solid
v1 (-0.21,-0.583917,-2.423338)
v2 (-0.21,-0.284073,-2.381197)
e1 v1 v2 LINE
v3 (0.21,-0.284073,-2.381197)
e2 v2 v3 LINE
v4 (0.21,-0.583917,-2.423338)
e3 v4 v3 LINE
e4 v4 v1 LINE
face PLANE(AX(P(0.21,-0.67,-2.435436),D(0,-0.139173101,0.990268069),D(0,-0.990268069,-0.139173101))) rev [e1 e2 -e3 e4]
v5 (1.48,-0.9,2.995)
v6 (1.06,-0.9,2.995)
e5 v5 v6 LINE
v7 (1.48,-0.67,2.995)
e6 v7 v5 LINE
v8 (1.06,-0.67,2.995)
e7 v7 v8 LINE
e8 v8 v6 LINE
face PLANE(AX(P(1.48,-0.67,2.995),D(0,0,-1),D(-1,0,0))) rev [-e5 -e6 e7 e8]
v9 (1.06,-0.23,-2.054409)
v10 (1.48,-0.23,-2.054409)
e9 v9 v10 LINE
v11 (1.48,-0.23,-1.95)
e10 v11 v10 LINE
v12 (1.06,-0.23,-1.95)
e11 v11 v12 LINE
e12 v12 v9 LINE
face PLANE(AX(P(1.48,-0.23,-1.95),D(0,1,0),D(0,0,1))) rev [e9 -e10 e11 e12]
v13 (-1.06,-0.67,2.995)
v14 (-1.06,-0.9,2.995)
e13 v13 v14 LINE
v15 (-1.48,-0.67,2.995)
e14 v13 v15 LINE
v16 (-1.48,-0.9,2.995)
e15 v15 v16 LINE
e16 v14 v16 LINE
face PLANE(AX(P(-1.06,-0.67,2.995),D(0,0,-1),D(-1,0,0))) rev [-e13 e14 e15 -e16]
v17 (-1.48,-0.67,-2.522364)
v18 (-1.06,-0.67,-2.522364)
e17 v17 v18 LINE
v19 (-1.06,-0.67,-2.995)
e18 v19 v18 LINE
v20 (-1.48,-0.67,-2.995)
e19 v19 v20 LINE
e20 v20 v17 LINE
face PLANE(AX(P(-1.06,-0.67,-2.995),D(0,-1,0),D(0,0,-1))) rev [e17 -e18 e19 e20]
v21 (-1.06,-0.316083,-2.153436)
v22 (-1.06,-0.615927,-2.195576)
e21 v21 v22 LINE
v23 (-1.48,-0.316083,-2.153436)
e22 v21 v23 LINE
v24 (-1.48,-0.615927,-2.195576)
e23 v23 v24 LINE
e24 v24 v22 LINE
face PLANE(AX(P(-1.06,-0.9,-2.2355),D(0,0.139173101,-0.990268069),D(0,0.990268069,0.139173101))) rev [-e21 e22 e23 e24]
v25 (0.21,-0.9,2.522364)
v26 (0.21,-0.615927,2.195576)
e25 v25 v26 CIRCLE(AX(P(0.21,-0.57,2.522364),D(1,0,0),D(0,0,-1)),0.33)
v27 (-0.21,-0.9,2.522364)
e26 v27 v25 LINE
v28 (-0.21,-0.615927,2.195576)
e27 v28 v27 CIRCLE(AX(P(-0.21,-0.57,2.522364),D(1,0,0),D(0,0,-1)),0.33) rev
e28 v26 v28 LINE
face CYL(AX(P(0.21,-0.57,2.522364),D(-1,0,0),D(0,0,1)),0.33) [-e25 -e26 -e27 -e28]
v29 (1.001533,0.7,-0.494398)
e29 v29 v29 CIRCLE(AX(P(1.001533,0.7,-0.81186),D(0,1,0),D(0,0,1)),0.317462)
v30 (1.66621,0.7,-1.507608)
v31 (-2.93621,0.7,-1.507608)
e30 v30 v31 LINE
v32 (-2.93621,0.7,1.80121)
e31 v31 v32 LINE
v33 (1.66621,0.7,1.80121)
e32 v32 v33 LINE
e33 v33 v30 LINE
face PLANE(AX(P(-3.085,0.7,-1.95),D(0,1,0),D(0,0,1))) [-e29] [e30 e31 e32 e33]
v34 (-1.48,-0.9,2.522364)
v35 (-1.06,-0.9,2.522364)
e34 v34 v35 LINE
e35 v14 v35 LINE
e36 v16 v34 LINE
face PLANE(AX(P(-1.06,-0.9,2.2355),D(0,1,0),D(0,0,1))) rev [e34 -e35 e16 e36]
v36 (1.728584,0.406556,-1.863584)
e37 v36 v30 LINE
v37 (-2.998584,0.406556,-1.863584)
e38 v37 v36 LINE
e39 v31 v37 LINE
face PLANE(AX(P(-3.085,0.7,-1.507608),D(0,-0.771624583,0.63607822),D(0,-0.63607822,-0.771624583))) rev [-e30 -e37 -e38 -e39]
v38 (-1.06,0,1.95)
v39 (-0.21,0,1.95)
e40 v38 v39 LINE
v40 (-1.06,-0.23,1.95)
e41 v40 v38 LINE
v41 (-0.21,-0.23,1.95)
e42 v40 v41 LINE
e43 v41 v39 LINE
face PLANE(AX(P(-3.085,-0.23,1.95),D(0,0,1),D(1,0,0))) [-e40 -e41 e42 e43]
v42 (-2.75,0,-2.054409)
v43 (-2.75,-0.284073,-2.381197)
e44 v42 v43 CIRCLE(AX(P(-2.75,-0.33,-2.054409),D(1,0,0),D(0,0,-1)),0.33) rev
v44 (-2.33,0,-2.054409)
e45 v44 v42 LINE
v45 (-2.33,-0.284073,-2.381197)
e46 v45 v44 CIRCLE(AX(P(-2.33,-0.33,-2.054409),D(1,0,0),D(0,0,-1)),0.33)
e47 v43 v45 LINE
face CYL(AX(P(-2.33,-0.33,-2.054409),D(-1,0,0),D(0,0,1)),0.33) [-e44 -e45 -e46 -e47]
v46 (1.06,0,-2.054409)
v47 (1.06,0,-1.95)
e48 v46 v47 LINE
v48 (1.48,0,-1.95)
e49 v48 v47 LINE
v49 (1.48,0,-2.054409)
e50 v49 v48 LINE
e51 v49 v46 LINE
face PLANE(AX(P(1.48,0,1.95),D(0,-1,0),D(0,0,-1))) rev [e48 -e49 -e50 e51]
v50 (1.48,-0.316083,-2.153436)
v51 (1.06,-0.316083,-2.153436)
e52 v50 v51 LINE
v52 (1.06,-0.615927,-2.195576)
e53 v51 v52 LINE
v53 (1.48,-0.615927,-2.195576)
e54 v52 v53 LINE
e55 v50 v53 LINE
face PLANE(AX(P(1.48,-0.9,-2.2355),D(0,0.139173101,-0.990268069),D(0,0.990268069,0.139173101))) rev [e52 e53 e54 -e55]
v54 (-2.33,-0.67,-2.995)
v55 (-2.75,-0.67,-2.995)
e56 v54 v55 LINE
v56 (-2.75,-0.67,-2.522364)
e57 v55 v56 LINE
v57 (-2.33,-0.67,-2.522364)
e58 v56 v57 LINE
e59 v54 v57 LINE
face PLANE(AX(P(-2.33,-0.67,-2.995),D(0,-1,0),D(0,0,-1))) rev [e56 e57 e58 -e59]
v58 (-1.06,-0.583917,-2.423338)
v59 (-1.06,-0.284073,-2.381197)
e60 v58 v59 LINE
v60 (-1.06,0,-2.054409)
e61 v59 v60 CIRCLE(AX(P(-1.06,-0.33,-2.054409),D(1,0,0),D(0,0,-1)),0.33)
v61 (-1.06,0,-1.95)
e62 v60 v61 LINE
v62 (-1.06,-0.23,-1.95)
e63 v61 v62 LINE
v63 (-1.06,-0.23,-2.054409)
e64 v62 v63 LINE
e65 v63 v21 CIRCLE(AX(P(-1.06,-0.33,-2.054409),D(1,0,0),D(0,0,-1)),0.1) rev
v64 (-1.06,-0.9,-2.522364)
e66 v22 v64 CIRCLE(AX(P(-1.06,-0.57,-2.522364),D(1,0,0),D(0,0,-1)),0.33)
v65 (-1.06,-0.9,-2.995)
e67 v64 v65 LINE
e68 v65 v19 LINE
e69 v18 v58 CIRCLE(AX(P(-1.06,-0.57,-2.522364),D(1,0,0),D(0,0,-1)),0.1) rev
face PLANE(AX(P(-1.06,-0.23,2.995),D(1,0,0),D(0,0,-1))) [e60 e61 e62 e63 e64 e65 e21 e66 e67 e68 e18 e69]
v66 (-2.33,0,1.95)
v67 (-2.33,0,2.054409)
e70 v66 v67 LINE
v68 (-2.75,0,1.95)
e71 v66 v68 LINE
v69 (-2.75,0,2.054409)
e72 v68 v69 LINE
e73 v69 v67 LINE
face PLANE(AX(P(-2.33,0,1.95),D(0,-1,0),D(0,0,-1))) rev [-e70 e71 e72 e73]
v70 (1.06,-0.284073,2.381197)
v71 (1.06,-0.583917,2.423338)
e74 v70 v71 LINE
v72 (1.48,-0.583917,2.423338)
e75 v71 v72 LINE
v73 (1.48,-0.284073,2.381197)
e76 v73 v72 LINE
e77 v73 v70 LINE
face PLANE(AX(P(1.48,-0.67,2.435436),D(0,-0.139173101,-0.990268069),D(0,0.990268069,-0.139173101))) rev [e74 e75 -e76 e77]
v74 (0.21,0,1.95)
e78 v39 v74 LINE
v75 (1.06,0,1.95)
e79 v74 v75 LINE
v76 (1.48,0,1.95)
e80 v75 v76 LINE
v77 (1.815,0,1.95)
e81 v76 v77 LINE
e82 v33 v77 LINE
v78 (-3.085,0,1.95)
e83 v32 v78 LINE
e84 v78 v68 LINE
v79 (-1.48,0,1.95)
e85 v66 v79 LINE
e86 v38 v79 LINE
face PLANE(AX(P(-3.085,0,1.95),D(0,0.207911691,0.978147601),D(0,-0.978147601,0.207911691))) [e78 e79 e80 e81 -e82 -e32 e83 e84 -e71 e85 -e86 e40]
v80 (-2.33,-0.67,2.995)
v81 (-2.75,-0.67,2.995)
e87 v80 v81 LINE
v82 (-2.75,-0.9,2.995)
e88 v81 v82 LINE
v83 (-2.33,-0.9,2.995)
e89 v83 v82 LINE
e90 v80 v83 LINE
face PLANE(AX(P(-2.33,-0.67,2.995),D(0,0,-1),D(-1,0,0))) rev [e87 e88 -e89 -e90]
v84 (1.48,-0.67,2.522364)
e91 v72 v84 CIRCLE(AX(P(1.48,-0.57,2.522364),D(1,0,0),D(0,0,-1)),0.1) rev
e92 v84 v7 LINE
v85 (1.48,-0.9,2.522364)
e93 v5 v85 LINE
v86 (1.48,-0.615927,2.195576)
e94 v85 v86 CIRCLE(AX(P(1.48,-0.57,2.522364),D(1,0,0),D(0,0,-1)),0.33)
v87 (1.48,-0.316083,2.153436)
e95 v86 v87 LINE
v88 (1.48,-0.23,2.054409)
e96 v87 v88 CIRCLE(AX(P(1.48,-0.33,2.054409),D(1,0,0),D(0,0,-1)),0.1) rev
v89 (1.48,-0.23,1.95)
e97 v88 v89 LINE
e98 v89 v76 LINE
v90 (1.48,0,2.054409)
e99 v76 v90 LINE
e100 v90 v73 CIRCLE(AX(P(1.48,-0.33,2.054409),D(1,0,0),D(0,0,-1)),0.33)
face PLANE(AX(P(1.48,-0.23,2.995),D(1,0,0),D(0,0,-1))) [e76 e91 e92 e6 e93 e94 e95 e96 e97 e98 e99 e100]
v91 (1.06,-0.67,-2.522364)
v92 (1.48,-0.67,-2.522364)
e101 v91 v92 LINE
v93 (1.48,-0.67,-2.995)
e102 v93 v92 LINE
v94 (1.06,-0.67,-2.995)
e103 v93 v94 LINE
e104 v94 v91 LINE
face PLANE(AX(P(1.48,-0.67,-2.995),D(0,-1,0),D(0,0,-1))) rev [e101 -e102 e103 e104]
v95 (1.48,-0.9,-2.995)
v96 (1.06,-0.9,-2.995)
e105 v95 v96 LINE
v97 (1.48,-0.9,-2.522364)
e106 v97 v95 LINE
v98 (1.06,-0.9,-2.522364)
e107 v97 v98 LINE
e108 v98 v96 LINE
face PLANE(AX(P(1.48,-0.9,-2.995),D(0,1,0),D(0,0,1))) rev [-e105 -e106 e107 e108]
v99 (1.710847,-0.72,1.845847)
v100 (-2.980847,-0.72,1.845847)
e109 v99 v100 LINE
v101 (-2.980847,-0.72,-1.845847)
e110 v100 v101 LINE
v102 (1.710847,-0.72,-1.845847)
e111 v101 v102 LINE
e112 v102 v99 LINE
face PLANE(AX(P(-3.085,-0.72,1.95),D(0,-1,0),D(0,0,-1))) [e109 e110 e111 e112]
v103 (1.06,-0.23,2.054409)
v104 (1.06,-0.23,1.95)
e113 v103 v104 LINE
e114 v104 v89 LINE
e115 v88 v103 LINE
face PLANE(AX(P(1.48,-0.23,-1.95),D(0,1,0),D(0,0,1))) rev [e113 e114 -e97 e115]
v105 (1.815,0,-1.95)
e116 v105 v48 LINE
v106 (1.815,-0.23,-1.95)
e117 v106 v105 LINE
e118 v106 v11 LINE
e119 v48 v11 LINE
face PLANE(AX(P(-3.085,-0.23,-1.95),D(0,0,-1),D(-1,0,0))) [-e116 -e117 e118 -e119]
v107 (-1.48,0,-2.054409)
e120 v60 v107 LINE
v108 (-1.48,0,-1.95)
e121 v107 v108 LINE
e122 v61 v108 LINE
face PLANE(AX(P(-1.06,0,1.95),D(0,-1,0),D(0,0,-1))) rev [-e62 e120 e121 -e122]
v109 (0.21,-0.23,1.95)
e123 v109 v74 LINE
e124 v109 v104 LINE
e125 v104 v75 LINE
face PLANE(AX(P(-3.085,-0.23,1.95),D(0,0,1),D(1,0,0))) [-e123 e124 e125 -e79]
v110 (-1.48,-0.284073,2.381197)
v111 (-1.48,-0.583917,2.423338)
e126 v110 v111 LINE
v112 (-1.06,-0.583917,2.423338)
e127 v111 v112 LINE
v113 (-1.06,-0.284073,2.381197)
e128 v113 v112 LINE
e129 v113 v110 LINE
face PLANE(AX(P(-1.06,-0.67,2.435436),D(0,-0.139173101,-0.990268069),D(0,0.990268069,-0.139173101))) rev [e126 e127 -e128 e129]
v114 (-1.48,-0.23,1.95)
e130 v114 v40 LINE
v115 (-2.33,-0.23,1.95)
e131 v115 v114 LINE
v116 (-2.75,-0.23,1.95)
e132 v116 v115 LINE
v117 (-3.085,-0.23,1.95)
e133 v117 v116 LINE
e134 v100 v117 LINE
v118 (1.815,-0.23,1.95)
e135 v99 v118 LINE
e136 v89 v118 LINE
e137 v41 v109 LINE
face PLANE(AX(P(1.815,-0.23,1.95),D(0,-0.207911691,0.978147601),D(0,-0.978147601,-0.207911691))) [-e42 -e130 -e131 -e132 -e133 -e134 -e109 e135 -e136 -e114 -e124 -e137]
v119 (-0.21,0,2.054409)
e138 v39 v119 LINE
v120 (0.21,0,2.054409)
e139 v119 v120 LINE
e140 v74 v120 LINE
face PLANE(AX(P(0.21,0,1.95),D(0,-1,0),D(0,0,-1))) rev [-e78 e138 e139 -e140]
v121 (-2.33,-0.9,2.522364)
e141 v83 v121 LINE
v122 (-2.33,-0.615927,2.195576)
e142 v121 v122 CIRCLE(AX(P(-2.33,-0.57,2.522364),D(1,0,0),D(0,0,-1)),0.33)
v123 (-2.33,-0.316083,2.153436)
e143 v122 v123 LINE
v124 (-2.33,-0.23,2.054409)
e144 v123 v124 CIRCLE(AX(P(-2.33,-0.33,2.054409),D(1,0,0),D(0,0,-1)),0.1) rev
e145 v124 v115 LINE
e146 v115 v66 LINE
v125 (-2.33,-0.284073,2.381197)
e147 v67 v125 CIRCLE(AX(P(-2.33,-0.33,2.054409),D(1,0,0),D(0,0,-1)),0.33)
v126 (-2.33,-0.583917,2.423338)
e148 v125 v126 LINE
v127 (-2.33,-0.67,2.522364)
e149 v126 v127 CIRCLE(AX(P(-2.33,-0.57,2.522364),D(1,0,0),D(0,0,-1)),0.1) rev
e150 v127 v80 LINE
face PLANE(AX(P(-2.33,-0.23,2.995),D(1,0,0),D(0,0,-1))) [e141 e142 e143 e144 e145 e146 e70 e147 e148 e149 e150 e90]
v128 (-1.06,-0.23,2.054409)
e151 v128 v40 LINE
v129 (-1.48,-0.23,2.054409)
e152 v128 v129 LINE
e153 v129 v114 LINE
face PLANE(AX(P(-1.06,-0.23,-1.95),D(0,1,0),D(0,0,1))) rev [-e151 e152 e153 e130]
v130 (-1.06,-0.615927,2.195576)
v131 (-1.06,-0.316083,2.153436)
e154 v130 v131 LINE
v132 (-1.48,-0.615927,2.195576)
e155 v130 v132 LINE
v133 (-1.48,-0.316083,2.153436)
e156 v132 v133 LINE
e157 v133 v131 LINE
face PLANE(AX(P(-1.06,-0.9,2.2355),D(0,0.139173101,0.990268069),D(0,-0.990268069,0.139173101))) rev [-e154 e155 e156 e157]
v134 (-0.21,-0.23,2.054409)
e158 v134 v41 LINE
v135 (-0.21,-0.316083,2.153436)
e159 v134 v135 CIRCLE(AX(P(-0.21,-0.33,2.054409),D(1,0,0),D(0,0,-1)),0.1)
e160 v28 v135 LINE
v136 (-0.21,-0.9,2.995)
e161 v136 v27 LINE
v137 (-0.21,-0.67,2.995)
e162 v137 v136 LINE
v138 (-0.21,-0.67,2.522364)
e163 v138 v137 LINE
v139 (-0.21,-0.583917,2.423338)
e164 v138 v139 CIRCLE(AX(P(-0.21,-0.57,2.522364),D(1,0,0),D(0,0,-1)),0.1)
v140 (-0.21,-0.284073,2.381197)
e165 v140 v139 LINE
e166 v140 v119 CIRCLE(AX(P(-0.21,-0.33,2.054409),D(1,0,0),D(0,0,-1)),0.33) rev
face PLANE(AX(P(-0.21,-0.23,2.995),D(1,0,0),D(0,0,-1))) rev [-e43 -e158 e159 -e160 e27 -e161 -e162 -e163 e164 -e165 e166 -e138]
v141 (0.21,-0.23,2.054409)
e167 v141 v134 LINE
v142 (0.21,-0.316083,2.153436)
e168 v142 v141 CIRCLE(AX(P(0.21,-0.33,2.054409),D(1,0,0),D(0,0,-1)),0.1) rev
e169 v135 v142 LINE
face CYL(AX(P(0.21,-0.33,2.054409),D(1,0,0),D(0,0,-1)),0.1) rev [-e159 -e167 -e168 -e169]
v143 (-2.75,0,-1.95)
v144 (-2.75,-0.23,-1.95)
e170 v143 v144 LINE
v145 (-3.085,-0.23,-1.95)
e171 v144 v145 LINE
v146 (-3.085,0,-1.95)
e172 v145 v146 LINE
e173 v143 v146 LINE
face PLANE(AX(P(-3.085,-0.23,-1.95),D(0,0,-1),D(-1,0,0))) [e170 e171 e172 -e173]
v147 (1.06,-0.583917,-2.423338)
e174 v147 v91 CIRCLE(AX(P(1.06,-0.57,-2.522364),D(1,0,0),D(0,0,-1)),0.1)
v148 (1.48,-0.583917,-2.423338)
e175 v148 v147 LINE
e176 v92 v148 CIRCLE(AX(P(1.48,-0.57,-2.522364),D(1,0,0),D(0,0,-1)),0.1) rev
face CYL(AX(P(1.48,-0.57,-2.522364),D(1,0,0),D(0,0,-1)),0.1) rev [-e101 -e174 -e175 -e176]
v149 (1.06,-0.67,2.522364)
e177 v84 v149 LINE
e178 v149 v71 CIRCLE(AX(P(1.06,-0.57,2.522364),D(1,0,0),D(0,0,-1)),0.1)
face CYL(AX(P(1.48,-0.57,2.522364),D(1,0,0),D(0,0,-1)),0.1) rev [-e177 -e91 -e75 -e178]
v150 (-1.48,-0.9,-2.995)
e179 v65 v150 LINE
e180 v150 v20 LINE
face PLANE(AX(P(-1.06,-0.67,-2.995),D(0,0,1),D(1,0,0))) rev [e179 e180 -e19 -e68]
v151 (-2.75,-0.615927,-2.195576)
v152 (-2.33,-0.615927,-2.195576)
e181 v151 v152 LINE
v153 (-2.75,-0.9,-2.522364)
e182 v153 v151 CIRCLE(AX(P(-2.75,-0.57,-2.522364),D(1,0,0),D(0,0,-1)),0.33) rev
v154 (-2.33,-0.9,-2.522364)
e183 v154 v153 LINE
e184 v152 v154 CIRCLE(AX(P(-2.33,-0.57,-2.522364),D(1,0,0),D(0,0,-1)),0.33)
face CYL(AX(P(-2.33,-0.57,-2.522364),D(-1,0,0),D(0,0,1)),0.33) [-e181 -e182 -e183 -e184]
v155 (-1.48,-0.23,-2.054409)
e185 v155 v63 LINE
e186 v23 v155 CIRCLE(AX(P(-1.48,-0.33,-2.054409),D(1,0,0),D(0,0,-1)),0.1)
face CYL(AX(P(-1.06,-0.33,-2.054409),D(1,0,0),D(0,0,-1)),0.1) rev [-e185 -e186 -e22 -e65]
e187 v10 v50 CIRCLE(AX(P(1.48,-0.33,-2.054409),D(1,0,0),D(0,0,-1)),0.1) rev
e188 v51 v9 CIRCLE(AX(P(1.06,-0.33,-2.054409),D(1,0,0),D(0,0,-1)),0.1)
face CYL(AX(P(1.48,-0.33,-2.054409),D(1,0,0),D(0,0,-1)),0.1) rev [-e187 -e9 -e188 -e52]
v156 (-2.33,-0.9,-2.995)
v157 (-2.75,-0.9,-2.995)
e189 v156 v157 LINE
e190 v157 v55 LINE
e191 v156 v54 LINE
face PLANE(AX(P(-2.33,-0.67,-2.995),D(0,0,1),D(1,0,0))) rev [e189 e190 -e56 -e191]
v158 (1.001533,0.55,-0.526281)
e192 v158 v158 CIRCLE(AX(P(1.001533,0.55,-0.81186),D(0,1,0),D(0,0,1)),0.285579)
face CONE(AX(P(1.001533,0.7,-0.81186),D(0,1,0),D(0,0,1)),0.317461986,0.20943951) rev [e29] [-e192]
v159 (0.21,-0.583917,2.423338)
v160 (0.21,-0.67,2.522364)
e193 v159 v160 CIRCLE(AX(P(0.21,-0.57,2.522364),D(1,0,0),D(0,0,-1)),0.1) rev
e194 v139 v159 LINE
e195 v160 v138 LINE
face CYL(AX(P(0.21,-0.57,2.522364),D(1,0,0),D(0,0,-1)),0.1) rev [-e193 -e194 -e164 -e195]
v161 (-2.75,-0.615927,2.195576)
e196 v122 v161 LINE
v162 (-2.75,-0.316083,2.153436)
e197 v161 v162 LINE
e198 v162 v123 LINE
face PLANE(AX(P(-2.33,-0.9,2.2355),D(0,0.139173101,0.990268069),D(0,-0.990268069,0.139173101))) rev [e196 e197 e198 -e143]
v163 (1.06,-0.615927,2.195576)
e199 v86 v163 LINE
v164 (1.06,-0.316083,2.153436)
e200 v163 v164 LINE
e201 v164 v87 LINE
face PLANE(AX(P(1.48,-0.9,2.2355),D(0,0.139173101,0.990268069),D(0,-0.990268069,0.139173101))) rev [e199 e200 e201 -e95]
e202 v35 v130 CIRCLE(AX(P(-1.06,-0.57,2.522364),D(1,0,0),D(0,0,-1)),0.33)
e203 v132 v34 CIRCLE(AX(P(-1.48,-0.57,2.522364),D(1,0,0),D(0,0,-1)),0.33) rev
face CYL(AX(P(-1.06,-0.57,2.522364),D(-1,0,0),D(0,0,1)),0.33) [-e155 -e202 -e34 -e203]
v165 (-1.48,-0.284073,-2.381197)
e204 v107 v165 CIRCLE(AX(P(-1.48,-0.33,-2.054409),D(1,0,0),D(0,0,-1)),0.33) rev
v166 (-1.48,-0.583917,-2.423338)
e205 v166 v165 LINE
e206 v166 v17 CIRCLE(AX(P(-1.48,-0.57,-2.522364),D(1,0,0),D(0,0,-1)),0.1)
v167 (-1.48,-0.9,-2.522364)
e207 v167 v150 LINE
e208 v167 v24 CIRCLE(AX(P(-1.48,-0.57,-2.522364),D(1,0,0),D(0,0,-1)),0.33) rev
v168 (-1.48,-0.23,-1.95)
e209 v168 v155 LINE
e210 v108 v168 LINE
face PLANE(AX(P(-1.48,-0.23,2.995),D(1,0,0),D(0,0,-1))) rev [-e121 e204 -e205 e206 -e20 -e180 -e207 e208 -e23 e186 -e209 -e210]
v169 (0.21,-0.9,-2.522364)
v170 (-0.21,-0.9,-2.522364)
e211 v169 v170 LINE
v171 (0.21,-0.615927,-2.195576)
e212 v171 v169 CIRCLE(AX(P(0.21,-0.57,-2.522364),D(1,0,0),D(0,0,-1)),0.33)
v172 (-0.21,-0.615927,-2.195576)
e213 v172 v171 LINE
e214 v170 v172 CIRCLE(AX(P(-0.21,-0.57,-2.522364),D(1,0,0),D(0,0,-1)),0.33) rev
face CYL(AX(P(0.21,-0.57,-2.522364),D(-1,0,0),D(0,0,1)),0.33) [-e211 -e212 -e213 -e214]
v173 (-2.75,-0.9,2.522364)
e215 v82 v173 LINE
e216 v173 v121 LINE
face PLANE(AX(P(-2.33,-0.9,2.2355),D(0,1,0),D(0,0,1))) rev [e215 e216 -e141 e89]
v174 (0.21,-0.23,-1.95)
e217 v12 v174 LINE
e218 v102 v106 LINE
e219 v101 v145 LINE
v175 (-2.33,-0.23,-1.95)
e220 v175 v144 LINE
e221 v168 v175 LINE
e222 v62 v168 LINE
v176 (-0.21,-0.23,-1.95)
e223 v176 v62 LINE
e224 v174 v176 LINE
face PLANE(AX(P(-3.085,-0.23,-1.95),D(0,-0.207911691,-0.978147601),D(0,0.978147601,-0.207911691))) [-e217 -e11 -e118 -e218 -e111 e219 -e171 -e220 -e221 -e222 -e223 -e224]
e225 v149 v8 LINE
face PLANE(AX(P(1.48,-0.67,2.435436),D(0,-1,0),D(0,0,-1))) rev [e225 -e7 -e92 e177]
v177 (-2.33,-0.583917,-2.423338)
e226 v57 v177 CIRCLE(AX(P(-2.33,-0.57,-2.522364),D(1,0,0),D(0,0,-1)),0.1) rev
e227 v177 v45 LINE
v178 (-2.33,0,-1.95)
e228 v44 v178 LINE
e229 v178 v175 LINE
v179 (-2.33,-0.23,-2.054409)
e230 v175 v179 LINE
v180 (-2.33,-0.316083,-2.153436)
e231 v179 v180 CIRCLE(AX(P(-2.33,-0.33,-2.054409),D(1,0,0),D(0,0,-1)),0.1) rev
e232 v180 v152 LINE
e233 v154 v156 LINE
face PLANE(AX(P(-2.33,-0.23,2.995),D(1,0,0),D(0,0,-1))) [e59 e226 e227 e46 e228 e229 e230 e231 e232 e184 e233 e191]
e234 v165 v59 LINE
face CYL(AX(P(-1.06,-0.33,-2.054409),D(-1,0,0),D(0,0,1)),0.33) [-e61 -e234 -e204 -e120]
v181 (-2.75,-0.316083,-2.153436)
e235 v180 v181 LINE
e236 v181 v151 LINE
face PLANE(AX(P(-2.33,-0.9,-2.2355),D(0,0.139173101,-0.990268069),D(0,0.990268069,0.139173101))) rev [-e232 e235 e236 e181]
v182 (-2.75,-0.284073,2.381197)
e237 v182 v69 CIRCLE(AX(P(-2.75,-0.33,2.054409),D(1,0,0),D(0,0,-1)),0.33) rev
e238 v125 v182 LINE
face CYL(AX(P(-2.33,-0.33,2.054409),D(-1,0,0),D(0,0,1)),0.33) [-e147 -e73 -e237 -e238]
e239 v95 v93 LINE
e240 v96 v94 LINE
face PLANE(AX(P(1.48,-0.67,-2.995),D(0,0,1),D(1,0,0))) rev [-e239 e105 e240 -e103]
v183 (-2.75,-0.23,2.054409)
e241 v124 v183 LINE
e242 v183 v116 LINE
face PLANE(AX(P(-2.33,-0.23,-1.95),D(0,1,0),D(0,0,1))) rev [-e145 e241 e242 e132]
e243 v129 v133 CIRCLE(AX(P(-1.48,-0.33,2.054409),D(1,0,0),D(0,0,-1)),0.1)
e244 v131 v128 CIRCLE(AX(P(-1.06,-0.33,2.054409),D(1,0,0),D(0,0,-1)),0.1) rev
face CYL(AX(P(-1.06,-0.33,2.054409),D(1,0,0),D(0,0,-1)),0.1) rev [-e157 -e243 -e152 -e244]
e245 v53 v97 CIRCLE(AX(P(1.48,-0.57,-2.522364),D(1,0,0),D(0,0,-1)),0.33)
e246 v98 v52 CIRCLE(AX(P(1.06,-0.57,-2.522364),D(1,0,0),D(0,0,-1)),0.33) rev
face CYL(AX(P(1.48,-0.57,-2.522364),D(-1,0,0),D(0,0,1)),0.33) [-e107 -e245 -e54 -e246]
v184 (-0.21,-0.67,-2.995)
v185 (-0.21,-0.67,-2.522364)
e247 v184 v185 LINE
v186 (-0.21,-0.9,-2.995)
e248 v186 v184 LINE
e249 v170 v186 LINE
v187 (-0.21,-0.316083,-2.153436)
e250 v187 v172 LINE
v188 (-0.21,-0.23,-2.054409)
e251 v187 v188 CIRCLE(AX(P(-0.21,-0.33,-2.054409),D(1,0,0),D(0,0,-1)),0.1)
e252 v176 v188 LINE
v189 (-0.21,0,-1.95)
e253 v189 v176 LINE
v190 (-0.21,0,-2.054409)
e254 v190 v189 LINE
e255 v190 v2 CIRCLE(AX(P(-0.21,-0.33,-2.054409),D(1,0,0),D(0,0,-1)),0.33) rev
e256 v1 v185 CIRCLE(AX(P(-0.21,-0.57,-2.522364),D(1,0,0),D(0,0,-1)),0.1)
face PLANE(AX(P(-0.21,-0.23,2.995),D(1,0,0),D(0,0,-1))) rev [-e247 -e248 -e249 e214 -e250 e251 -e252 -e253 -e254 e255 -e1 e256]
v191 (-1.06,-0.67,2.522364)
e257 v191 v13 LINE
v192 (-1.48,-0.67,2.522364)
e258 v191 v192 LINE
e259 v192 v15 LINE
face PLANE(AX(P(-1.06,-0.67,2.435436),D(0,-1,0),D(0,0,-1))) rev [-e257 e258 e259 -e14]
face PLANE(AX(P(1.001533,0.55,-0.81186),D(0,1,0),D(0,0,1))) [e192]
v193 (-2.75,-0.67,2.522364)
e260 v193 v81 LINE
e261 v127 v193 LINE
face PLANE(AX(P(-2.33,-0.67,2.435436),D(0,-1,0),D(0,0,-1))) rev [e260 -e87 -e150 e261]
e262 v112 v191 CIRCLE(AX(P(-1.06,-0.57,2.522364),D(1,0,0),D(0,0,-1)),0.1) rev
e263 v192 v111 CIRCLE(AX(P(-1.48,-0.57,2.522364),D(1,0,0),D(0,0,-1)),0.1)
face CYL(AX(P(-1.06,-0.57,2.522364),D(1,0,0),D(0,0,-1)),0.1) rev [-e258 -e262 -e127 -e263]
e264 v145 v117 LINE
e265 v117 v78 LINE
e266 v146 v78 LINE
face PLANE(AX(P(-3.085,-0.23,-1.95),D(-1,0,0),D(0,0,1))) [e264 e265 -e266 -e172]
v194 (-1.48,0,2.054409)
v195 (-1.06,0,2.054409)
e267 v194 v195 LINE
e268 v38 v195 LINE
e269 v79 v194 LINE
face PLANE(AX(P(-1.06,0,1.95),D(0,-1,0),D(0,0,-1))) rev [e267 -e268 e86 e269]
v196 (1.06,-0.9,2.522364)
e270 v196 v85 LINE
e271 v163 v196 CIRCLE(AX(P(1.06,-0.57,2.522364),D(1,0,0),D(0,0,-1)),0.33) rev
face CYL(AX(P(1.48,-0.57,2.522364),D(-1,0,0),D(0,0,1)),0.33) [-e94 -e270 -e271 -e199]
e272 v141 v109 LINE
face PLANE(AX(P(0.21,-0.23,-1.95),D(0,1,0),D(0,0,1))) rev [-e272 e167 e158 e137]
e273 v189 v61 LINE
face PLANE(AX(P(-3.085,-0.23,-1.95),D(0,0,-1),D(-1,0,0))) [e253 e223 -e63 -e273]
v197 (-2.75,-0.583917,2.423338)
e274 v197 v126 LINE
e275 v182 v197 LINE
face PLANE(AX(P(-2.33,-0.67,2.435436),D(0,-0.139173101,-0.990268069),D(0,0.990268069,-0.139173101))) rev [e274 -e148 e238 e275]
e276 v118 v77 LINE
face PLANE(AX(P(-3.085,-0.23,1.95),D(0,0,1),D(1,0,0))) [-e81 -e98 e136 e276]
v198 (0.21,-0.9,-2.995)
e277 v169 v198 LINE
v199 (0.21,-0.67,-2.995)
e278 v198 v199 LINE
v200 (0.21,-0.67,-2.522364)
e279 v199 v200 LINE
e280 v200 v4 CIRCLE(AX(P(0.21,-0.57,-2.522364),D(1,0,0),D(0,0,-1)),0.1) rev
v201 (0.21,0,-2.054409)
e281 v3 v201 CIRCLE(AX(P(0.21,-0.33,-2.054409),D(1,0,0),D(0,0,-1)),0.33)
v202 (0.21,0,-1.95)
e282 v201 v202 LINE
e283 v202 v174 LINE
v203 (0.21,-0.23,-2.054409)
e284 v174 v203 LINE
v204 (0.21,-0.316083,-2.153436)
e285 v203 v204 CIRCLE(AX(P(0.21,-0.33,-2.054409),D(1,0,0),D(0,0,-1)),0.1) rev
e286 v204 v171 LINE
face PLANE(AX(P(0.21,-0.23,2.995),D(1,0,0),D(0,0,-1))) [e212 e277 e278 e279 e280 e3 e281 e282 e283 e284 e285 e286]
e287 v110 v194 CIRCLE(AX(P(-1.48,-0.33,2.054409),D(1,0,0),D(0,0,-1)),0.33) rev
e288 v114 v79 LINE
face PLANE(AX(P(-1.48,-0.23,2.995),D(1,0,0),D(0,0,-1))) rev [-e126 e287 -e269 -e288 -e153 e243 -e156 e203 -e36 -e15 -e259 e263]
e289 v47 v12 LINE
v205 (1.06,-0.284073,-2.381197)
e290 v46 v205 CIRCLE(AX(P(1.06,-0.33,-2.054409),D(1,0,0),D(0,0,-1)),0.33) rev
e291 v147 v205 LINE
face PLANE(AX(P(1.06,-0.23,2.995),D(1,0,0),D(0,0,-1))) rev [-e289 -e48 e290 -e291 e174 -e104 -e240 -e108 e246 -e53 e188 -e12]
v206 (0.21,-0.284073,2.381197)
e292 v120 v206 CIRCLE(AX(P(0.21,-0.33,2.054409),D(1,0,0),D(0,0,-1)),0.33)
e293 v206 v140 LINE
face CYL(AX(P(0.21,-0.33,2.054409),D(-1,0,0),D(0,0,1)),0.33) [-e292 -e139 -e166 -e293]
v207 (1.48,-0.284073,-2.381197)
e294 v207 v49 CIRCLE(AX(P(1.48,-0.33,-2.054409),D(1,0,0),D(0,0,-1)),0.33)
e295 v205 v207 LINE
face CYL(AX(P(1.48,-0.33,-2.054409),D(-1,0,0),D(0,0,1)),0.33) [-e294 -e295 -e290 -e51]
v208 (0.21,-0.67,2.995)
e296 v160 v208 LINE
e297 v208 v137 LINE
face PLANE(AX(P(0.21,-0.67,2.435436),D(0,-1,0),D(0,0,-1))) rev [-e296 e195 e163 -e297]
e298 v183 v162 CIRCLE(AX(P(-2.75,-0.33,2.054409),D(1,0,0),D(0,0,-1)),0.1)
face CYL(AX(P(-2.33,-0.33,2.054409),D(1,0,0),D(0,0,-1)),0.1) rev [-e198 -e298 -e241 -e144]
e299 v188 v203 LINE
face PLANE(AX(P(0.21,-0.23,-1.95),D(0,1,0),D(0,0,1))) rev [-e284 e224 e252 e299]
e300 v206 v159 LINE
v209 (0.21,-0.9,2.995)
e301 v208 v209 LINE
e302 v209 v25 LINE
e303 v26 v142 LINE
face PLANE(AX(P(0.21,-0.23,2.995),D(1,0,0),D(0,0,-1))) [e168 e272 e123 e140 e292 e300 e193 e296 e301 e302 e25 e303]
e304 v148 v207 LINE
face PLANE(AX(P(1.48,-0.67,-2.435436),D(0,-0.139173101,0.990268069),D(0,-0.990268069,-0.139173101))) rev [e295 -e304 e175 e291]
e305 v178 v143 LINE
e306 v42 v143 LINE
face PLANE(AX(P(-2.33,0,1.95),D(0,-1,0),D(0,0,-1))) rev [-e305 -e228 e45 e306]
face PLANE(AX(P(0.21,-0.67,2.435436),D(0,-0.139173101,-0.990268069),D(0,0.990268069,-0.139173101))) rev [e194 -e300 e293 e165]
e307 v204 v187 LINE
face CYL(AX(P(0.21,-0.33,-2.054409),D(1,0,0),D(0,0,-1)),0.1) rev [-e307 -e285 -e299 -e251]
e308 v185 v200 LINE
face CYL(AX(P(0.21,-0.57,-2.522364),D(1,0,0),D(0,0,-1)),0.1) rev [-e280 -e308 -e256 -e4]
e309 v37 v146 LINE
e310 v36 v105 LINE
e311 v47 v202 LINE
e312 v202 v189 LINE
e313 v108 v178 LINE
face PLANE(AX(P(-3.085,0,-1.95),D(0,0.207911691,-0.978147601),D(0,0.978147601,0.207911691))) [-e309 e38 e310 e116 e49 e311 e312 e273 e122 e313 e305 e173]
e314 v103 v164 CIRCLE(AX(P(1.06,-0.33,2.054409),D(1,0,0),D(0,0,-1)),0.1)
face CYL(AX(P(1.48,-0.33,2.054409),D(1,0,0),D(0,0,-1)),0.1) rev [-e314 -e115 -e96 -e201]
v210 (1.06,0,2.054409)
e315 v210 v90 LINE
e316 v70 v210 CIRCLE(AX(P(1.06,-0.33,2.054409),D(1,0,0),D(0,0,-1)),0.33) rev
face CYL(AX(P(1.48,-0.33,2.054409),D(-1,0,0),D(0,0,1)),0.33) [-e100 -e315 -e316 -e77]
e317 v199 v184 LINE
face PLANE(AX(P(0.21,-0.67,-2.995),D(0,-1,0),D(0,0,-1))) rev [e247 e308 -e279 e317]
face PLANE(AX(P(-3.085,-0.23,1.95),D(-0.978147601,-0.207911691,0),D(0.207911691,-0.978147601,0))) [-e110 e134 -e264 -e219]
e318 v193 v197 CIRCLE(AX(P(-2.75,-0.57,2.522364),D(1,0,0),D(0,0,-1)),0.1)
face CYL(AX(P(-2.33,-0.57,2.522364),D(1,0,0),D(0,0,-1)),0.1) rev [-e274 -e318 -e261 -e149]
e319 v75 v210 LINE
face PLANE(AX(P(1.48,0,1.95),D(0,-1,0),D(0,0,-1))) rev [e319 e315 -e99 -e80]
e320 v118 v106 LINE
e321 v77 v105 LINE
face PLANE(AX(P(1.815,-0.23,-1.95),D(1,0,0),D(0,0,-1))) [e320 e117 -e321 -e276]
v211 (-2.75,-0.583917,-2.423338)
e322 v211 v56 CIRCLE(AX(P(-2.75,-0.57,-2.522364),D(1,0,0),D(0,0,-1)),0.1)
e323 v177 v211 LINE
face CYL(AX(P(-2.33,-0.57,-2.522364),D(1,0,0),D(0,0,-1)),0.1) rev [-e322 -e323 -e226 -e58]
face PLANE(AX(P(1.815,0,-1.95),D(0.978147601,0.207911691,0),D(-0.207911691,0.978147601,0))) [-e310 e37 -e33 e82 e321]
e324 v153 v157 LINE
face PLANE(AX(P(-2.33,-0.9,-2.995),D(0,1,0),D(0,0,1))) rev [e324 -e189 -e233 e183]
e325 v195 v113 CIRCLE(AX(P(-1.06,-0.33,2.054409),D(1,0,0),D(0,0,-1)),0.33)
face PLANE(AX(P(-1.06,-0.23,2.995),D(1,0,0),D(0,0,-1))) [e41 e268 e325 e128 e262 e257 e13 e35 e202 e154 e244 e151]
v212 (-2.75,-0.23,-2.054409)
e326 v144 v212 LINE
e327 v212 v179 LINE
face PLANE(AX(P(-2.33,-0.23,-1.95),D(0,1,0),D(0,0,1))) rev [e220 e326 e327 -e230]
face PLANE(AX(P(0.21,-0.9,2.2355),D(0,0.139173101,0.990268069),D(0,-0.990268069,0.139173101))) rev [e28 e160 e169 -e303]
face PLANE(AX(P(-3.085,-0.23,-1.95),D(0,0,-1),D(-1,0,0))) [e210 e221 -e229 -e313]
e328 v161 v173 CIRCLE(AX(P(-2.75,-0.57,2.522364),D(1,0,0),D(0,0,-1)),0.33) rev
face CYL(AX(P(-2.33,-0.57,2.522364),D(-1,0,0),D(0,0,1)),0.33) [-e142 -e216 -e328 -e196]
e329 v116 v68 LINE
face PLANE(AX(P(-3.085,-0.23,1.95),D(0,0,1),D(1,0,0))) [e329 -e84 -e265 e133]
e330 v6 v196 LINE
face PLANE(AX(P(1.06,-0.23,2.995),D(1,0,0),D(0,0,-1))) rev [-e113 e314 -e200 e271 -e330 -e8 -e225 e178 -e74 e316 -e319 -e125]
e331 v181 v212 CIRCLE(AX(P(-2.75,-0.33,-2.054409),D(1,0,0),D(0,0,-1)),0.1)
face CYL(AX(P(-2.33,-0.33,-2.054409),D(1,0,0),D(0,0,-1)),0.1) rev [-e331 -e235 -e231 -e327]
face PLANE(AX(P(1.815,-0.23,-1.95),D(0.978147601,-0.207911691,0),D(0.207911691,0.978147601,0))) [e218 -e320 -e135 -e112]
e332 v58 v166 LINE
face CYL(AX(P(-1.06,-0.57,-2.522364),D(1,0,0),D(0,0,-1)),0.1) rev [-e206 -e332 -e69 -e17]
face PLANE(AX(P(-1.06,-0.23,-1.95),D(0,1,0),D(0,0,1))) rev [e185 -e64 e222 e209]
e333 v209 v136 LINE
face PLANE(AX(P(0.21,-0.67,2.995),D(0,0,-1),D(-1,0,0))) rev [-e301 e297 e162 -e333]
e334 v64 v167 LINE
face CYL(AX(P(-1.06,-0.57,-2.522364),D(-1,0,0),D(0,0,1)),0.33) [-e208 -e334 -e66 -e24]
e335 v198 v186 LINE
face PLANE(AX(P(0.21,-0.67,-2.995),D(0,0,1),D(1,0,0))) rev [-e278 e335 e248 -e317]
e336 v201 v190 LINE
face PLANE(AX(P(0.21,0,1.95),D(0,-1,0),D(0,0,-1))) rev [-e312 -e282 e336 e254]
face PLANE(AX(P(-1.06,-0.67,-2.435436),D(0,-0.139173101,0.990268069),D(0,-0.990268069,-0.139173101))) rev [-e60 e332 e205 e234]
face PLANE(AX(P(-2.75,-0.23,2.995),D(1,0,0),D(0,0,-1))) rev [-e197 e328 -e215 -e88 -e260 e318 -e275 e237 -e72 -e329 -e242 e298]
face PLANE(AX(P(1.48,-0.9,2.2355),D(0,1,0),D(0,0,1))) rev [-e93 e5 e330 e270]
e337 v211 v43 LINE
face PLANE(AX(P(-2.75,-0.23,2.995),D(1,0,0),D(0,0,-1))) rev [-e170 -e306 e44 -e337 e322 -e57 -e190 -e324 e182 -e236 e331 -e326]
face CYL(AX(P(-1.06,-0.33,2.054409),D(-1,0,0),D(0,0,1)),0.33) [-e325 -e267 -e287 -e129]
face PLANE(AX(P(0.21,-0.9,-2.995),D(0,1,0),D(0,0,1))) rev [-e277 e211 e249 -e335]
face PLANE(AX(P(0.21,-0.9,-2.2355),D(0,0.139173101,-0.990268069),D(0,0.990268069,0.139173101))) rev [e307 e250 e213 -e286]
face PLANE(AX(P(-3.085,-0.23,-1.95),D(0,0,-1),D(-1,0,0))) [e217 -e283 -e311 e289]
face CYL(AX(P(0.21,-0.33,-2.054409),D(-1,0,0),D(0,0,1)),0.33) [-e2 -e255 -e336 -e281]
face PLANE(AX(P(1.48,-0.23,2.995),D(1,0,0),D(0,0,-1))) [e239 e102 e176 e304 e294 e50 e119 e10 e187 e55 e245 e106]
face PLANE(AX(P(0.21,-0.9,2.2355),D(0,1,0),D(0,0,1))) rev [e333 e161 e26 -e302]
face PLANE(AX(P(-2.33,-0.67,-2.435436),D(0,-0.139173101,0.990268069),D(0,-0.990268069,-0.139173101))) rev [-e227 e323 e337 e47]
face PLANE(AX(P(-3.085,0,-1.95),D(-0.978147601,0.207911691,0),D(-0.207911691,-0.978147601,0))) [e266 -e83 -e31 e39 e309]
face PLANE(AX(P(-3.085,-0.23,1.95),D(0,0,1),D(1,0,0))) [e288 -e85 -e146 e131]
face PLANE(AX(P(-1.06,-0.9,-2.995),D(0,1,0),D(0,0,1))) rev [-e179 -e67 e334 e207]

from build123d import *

# Parameters (mm, degrees)
SKETCH1_W                = 4.9
SKETCH1_H                = 3.9
EXTRUDE1_DEPTH           = 0.7
EXTRUDE1_TAPER           = 12
EXTRUDE1_OTHER_WAY_DEPTH = 0.23
SKETCH2_W                = 4.9
SKETCH2_H                = 3.9
EXTRUDE2_DEPTH           = 0.49
EXTRUDE2_TAPER           = 12
CHAMFER1_SIZE            = 0.29360287
CHAMFER1_SIZE_2          = 0.3
SKETCH3_R                = 0.317461986
CUT_EXTRUDE1_DEPTH       = 0.15
CUT_EXTRUDE1_DRAFT       = -12
EXTRUDE3_DEPTH           = 0.21
LPATTERN3_COUNT          = 2
LPATTERN3_PITCH          = 1.27
LPATTERN3_COL_COUNT      = 3
LPATTERN3_COL_PITCH      = 1.27
FILLET1_R                = 0.1
FILLET2_R                = 0.33


with BuildPart() as part:
    # Sketch1 → Extrude1 (new body)
    with BuildSketch(Plane(origin=(0, 0, 0), x_dir=(1, 0, 0), z_dir=(0, 1, 0))):
        with Locations((-0.635, 0)):
            Rectangle(SKETCH1_W, SKETCH1_H)
    extrude(amount=EXTRUDE1_DEPTH, taper=EXTRUDE1_TAPER)

    # Sketch1 → Extrude1 other way (add)
    with BuildSketch(Plane(origin=(0, 0, 0), x_dir=(1, 0, 0), z_dir=(0, 1, 0))):
        with Locations((-0.635, 0)):
            Rectangle(SKETCH1_W, SKETCH1_H)
    extrude(amount=-EXTRUDE1_OTHER_WAY_DEPTH)

    # Sketch2 → Extrude2 (add)
    with BuildSketch(Plane.XZ.offset(0.23)):
        with Locations((-0.635, 0)):
            Rectangle(SKETCH2_W, SKETCH2_H)
    extrude(amount=EXTRUDE2_DEPTH, taper=EXTRUDE2_TAPER)

    # Chamfer1
    # the kernel refuses this chamfer: 0.3, 0.29360287 mm, written as the material it takes off along each edge
    with BuildSketch(Plane(origin=(2.439914076, 0.7, -1.801210407), x_dir=(0, 0.025194664498195983, 0.9996825640576229), z_dir=(-1, 0, 0))) as chamfer1_piece_1:
        Polygon((CHAMFER1_SIZE * 0.999682563914, -CHAMFER1_SIZE * 0.0251946644946), (-CHAMFER1_SIZE_2 * 0.232489792804, -CHAMFER1_SIZE_2 * 0.972598836233), (0, 0), align=None)
    extrude(amount=6.149828151, mode=Mode.SUBTRACT)


with BuildPart() as cut_extrude1_tool:
    # Sketch3 → Cut-Extrude1 (with draft: the straight prism first)
    with BuildSketch(Plane(origin=(0, 0.7, 0), x_dir=(-1, 0, 0), z_dir=(0, 1, 0))):
        with Locations((-1.001533305, -0.811859934)):
            Circle(SKETCH3_R)
    extrude(amount=-CUT_EXTRUDE1_DEPTH)
    # Cut-Extrude1: the draft: its side faces are tilted about the plane it starts from
    cut_extrude1_sides = [cut_extrude1_tool.faces().sort_by_distance(p)[0] for p in [
        (1.318995291, 0.625, -0.811859934),
    ]]
    draft(cut_extrude1_sides, Plane(origin=(0, 0.7, 0), x_dir=(-1, 0, 0), z_dir=(0, 1, 0)), CUT_EXTRUDE1_DRAFT)


with BuildPart() as part_1:
    add(part.part)

    # Cut-Extrude1: cut by cut_extrude1_tool
    add(cut_extrude1_tool.part, mode=Mode.SUBTRACT)

    # Sketch4 → Extrude3 (add, symmetric)
    with BuildSketch(Plane(origin=(0, 0, 0), x_dir=(0, 0, -1), z_dir=(1, 0, 0))):
        Polygon((1.95, -0.23), (-1.95, -0.23), (-2.141337425, -0.23), (-2.235499784, -0.9), (-2.995, -0.9), (-2.995, -0.67), (-2.435435734, -0.67), (-2.341273375, 0), (-1.95, 0), (1.95, 0), (2.341273375, 0), (2.435435734, -0.67), (2.995, -0.67), (2.995, -0.9), (2.235499784, -0.9), (2.141337425, -0.23), align=None)
    extrude3 = extrude(amount=EXTRUDE3_DEPTH, both=True)

    # LPattern3: Extrude3 ×2
    with Locations(*[(i * LPATTERN3_PITCH, 0, 0) for i in range(1, LPATTERN3_COUNT)]):
        add(extrude3)

    # LPattern3 col: Extrude3 ×3
    with Locations(*[(-i * LPATTERN3_COL_PITCH, 0, 0) for i in range(1, LPATTERN3_COL_COUNT)]):
        add(extrude3)

    # Fillet1
    fillet1_edges = [part_1.edges().sort_by_distance(p)[0] for p in [
        (-1.27, -0.23, 2.141337425),
        (-1.27, -0.23, -2.141337425),
        (-1.27, -0.67, -2.435435734),
        (-1.27, -0.67, 2.435435734),
        (-2.54, -0.23, 2.141337425),
        (-2.54, -0.23, -2.141337425),
        (-2.54, -0.67, -2.435435734),
        (-2.54, -0.67, 2.435435734),
        (1.27, -0.23, 2.141337425),
        (1.27, -0.23, -2.141337425),
        (1.27, -0.67, -2.435435734),
        (1.27, -0.67, 2.435435734),
        (0, -0.23, 2.141337425),
        (0, -0.23, -2.141337425),
        (0, -0.67, -2.435435734),
        (0, -0.67, 2.435435734),
    ]]
    fillet(fillet1_edges, radius=FILLET1_R)

    # Fillet2
    fillet2_edges = [part_1.edges().sort_by_distance(p)[0] for p in [
        (-1.27, 0, -2.341273375),
        (-1.27, -0.9, -2.235499784),
        (-1.27, 0, 2.341273375),
        (-1.27, -0.9, 2.235499784),
        (-2.54, 0, -2.341273375),
        (-2.54, -0.9, -2.235499784),
        (-2.54, 0, 2.341273375),
        (-2.54, -0.9, 2.235499784),
        (1.27, 0, -2.341273375),
        (1.27, -0.9, -2.235499784),
        (1.27, 0, 2.341273375),
        (1.27, -0.9, 2.235499784),
        (0, 0, -2.341273375),
        (0, -0.9, -2.235499784),
        (0, 0, 2.341273375),
        (0, -0.9, 2.235499784),
    ]]
    fillet(fillet2_edges, radius=FILLET2_R)


solid = part_1.part
